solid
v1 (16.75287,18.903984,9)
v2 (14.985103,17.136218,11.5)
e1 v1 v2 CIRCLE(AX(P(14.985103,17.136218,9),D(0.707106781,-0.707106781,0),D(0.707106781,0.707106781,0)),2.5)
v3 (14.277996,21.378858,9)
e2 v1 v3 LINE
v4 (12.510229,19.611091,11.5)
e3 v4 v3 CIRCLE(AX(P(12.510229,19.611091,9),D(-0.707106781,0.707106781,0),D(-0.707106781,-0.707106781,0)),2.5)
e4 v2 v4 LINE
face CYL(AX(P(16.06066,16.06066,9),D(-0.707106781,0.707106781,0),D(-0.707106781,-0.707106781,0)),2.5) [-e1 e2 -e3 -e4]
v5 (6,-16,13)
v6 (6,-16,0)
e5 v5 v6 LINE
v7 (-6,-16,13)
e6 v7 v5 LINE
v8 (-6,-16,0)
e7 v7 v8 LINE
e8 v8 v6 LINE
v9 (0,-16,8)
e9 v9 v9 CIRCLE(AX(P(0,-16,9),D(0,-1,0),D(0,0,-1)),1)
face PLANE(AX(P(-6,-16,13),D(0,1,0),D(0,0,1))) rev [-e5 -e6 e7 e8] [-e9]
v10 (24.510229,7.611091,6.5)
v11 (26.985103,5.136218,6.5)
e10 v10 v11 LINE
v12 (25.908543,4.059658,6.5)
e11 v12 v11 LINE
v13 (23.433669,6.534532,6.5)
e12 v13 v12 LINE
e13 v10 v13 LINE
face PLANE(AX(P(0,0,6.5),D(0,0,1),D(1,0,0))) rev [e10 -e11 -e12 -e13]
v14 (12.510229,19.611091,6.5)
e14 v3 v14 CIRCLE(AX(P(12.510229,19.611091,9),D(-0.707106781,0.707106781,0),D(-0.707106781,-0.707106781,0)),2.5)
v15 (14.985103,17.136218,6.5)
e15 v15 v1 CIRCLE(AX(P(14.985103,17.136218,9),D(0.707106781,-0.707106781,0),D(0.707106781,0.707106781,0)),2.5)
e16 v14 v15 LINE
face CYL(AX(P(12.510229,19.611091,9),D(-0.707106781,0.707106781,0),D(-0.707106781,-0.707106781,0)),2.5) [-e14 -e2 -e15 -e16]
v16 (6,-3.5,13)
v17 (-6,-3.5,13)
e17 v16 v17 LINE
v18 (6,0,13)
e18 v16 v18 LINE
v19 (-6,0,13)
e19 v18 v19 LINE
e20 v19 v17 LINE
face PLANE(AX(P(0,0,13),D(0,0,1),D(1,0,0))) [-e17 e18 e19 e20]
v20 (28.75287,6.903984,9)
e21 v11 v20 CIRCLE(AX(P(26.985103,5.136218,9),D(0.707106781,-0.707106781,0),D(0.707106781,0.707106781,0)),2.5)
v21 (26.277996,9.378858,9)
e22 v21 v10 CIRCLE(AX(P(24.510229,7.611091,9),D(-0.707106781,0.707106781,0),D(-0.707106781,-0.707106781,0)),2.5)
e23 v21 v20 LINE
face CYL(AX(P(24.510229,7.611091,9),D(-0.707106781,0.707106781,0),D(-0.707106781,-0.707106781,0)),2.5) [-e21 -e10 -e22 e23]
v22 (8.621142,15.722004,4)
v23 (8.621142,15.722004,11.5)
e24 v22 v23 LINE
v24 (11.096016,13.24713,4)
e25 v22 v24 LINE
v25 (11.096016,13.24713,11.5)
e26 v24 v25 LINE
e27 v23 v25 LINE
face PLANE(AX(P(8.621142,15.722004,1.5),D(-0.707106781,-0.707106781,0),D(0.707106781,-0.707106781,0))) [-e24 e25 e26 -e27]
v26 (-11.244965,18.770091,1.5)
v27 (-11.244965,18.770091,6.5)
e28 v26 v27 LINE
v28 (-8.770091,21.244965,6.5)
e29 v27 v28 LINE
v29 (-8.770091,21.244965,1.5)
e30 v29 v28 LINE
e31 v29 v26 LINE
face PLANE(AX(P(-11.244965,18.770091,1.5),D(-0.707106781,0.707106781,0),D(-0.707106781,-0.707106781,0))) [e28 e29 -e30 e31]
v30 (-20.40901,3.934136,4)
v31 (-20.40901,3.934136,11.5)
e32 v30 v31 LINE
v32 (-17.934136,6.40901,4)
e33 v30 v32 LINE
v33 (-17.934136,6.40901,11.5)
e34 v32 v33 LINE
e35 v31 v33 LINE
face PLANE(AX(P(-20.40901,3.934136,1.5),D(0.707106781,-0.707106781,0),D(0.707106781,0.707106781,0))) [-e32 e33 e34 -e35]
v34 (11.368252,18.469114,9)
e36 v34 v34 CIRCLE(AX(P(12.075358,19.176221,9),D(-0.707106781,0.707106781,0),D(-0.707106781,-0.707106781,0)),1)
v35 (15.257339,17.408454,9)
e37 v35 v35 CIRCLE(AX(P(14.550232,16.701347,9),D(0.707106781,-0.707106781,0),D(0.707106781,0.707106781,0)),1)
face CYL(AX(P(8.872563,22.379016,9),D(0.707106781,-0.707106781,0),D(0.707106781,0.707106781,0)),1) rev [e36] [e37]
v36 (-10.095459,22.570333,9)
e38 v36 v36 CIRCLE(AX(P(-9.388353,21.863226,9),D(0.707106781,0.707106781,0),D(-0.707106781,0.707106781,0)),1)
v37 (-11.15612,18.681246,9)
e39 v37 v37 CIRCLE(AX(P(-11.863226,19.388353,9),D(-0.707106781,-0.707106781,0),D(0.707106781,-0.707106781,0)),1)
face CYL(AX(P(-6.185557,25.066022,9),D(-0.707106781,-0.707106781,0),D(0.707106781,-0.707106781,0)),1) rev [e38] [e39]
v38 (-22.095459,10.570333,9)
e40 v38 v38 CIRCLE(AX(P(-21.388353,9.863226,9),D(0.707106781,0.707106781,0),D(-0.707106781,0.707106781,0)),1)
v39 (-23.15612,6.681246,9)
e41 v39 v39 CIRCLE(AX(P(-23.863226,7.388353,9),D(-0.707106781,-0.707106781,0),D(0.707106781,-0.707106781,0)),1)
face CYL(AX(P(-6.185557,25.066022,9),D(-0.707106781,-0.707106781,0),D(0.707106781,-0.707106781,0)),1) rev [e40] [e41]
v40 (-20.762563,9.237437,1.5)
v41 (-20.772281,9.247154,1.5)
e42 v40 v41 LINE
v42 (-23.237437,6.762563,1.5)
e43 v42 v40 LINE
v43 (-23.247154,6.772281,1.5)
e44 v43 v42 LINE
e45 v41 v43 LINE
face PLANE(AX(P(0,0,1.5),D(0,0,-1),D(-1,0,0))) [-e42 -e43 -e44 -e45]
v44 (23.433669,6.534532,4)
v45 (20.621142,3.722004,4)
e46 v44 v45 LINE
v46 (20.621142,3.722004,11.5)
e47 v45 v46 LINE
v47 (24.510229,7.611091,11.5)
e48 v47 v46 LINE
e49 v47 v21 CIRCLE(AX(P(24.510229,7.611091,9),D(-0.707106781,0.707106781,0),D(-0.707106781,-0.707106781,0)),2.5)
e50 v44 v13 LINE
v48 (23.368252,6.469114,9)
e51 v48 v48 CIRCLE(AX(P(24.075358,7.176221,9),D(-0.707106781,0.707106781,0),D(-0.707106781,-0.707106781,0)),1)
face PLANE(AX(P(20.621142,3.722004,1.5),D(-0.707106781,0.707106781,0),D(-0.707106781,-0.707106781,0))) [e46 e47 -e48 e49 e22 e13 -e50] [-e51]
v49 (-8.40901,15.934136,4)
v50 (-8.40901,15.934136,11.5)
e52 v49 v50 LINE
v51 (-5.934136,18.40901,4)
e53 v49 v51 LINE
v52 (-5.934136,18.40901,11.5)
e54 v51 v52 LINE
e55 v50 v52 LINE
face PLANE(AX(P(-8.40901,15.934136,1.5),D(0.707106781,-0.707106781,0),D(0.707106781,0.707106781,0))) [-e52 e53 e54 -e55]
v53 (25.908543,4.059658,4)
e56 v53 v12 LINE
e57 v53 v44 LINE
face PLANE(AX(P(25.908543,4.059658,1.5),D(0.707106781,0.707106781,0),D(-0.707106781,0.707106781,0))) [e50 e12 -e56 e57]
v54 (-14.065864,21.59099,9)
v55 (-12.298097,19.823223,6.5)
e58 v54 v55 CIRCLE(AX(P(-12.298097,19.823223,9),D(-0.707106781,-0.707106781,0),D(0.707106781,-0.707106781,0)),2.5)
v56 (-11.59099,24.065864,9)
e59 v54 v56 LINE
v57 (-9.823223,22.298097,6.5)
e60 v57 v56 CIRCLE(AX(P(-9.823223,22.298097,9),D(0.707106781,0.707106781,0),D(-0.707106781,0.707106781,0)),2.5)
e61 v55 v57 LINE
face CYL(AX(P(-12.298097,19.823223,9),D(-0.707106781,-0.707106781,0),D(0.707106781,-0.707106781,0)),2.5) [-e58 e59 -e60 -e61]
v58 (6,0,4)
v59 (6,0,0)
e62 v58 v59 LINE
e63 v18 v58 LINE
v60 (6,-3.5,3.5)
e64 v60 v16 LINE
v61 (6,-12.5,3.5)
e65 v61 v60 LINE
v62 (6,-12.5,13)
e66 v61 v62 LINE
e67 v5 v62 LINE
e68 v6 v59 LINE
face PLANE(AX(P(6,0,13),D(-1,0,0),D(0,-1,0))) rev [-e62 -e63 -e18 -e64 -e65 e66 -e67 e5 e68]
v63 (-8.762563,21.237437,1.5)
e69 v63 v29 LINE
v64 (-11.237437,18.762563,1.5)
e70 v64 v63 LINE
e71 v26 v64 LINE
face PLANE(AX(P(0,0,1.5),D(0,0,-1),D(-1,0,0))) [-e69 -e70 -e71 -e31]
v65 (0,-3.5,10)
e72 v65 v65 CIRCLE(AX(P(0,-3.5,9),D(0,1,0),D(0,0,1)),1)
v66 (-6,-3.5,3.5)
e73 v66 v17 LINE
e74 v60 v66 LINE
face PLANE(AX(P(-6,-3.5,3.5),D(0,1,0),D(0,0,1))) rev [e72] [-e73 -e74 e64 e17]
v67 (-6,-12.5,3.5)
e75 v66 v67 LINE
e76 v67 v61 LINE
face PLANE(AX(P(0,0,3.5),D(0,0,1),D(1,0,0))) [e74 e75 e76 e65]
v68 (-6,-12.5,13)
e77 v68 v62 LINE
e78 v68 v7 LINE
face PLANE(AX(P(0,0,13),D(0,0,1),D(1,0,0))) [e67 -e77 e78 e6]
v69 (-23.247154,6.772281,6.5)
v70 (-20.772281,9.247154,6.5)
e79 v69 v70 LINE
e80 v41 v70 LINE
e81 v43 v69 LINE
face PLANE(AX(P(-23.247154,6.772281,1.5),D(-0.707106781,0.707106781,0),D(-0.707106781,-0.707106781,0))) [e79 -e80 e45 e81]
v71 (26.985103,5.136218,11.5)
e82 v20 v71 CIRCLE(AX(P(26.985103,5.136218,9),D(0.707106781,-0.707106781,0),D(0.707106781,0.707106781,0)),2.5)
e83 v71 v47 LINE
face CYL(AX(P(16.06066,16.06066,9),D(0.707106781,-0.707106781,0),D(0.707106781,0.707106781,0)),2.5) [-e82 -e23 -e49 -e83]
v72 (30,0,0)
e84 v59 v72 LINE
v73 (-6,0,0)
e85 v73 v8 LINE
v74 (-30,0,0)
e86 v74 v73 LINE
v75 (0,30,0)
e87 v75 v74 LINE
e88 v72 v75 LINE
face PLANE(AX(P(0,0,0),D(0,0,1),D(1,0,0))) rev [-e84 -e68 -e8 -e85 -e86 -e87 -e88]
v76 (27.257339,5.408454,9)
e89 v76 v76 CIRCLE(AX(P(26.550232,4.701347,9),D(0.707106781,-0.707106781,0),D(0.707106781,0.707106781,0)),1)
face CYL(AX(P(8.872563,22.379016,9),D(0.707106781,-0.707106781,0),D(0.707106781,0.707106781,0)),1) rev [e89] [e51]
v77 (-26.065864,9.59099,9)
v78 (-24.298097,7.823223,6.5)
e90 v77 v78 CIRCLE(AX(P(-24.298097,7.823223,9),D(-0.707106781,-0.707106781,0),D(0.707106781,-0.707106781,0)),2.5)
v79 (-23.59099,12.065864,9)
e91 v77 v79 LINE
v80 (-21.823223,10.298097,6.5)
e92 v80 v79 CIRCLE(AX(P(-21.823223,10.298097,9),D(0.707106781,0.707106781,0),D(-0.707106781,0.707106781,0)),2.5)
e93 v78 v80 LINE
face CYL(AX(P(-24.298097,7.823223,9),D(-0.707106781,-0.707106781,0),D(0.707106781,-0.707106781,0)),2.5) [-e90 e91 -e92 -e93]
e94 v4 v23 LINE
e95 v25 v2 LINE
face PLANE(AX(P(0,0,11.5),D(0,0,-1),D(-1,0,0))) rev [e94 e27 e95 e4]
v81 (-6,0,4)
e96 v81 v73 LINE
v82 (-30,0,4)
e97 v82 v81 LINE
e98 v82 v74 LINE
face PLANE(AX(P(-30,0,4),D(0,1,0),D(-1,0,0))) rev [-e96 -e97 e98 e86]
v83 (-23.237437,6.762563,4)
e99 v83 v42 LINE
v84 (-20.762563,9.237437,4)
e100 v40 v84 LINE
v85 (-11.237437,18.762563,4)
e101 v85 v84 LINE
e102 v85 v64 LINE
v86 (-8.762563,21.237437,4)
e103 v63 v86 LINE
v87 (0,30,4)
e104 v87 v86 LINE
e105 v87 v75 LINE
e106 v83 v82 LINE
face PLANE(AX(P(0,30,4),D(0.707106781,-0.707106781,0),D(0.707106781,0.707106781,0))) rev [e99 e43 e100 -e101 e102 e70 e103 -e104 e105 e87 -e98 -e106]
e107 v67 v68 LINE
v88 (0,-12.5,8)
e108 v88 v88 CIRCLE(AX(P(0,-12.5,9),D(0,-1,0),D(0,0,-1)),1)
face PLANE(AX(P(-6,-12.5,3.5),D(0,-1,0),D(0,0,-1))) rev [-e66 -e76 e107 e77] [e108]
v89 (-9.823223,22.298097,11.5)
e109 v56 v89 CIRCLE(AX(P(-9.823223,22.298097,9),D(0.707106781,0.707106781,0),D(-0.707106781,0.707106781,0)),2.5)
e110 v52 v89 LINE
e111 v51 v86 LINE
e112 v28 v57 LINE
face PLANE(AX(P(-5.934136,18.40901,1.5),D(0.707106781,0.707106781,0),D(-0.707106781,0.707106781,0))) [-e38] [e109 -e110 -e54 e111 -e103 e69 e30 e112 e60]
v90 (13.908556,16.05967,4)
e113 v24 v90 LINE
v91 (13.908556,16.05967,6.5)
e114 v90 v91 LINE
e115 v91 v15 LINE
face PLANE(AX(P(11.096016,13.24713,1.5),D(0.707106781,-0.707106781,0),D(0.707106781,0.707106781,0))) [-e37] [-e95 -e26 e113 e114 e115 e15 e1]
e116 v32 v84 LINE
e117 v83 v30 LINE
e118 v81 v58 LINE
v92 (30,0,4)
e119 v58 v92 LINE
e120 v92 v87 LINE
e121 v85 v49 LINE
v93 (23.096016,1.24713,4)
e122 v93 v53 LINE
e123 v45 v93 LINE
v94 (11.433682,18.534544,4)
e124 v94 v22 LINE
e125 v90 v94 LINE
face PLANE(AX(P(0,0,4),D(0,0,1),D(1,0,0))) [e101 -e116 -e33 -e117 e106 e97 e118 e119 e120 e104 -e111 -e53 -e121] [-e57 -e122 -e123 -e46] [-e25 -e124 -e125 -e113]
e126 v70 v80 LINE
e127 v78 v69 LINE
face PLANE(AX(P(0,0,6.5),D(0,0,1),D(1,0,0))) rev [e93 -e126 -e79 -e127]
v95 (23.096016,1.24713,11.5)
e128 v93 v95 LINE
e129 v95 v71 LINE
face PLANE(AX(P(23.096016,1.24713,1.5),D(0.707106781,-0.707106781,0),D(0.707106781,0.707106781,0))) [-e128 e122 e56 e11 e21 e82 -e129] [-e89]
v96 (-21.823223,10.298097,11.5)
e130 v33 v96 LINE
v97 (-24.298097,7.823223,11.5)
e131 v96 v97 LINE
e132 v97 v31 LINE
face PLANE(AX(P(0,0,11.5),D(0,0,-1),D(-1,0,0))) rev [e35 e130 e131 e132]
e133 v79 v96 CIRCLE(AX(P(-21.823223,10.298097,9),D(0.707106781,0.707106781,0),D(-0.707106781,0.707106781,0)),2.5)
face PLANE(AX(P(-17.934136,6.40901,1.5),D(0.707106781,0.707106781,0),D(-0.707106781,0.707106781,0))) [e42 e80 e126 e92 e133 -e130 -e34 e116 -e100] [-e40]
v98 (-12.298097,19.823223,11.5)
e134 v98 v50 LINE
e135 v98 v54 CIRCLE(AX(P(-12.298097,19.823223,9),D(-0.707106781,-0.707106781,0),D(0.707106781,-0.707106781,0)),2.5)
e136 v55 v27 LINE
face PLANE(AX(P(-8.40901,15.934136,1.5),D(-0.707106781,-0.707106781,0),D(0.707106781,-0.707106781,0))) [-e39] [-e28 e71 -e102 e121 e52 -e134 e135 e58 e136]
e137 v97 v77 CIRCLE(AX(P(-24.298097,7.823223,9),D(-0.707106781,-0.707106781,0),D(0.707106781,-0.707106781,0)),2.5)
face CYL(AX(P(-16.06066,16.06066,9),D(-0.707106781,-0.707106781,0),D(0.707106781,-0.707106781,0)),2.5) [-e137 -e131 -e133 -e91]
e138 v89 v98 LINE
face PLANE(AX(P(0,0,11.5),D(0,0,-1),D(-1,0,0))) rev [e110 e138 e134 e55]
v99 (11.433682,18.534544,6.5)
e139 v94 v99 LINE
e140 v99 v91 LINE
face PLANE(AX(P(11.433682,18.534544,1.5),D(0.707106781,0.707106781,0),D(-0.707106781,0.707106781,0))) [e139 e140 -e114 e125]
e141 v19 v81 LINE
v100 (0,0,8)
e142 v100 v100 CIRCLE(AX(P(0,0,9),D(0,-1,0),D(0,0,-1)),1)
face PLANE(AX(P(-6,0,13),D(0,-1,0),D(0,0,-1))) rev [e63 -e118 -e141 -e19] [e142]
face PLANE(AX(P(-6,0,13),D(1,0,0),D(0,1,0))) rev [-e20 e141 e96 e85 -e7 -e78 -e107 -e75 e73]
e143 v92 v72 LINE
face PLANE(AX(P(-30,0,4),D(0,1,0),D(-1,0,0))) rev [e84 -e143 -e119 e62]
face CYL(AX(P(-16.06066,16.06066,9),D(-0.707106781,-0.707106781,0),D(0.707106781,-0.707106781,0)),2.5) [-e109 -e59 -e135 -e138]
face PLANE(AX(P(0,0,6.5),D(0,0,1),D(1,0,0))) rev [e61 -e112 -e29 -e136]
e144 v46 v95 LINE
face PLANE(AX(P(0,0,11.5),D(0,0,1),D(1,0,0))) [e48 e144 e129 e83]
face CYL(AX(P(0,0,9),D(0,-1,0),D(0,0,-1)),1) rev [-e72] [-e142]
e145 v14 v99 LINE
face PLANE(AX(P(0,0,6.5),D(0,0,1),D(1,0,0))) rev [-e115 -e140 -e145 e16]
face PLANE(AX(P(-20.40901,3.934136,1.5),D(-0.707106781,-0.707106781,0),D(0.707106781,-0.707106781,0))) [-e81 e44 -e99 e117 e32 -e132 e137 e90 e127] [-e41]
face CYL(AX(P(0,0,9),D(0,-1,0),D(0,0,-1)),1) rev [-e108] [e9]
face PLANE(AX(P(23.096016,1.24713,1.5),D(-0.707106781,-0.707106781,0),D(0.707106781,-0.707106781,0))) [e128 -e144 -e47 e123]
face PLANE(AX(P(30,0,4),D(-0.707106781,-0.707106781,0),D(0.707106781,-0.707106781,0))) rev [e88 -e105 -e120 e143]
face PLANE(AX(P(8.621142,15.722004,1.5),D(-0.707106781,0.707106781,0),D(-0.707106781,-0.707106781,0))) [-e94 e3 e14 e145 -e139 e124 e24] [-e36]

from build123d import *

# Parameters (mm, degrees)
BOSS_EXTRUDE1_DEPTH   = 4
BOSS_EXTRUDE2_START   = -4
SKETCH2_W             = 12
SKETCH2_H             = 16
BOSS_EXTRUDE2_DEPTH   = 13
SKETCH3_W             = 12
SKETCH3_H             = 9
CUT_EXTRUDE1_DEPTH    = 9.5
SKETCH4_R             = 1
CUT_EXTRUDE2_DEPTH    = 16
BOSS_EXTRUDE3_START   = 2.5
BOSS_EXTRUDE3_DEPTH   = 5
BOSS_EXTRUDE3_2_DEPTH = 5
BOSS_EXTRUDE3_3_DEPTH = 5
BOSS_EXTRUDE3_4_DEPTH = 5
BOSS_EXTRUDE4_DEPTH   = 10
SKETCH6_R             = 1
CUT_EXTRUDE5_DEPTH    = 25
SKETCH7_R             = 1
CUT_EXTRUDE6_DEPTH    = 25
FILLET2_R             = 2.5


with BuildPart() as part:
    # Sketch1 → Boss-Extrude1 (new body)
    with BuildSketch(Plane.XY):
        Polygon((-30, 0), (30, 0), (0, 30), align=None)
    extrude(amount=BOSS_EXTRUDE1_DEPTH)

    # Sketch2 → Boss-Extrude2 (add)
    with BuildSketch(Plane.XY.offset(4).offset(BOSS_EXTRUDE2_START)):
        with Locations((0, -8)):
            Rectangle(SKETCH2_W, SKETCH2_H)
    extrude(amount=BOSS_EXTRUDE2_DEPTH)

    # Sketch3 → Cut-Extrude1 (cut)
    with BuildSketch(Plane.XY.offset(13)):
        with Locations((0, -8)):
            Rectangle(SKETCH3_W, SKETCH3_H)
    extrude(amount=-CUT_EXTRUDE1_DEPTH, mode=Mode.SUBTRACT)

    # Sketch4 → Cut-Extrude2 (cut)
    with BuildSketch(Plane.XZ.offset(16)):
        with Locations(Location((0, 9, 0), (0, 0, 270))):
            Circle(SKETCH4_R)
    extrude(amount=-CUT_EXTRUDE2_DEPTH, mode=Mode.SUBTRACT)



with BuildPart() as body_2:
    # Sketch5 → Boss-Extrude3 (new body)
    with BuildSketch(Plane.XY.offset(4).offset(BOSS_EXTRUDE3_START)):
        Polygon((-8.409009742, 15.934136008), (-14.065863992, 21.590990258), (-11.590990258, 24.065863992), (-5.934136008, 18.409009742), align=None)
    extrude(amount=BOSS_EXTRUDE3_DEPTH)


with BuildPart() as body_3:
    # Sketch5 → Boss-Extrude3 2 (new body)
    with BuildSketch(Plane.XY.offset(4).offset(BOSS_EXTRUDE3_START)):
        Polygon((-20.409009742, 3.934136008), (-26.065863992, 9.590990258), (-23.590990258, 12.065863992), (-17.934136008, 6.409009742), align=None)
    extrude(amount=BOSS_EXTRUDE3_2_DEPTH)


with BuildPart() as body_4:
    # Sketch5 → Boss-Extrude3 3 (new body)
    with BuildSketch(Plane.XY.offset(4).offset(BOSS_EXTRUDE3_START)):
        Polygon((8.621141777, 15.722003974), (14.277996026, 21.378858223), (16.75286976, 18.903984489), (11.096015511, 13.24713024), align=None)
    extrude(amount=BOSS_EXTRUDE3_3_DEPTH)


with BuildPart() as body_5:
    # Sketch5 → Boss-Extrude3 4 (new body)
    with BuildSketch(Plane.XY.offset(4).offset(BOSS_EXTRUDE3_START)):
        Polygon((20.621141777, 3.722003974), (26.277996026, 9.378858223), (28.75286976, 6.903984489), (23.096015511, 1.24713024), align=None)
    extrude(amount=BOSS_EXTRUDE3_4_DEPTH)


with BuildPart() as part_1:
    add(part.part)

    add(body_2.part)  # Boss-Extrude4 merges body 2

    add(body_3.part)  # Boss-Extrude4 merges body 3

    add(body_4.part)  # Boss-Extrude4 merges body 4

    add(body_5.part)  # Boss-Extrude4 merges body 5
    # Sketch8 → Boss-Extrude4 (add)
    with BuildSketch(Plane.XY.offset(11.5)):
        Polygon((-20.409009742, 3.934136008), (-17.934136008, 6.409009742), (-20.77228069, 9.247154424), (-23.247154424, 6.77228069), align=None)
        Polygon((-8.409009742, 15.934136008), (-5.934136008, 18.409009742), (-8.770090905, 21.24496464), (-11.24496464, 18.770090905), align=None)
        Polygon((8.621141777, 15.722003974), (11.096015511, 13.24713024), (13.908555635, 16.059670364), (11.433681901, 18.534544098), align=None)
        Polygon((23.096015511, 1.24713024), (20.621141777, 3.722003974), (23.433669477, 6.534531674), (25.908543211, 4.05965794), align=None)
    extrude(amount=-BOSS_EXTRUDE4_DEPTH)

    # Sketch6 → Cut-Extrude5 (cut)
    with BuildSketch(Plane(origin=(10.924442636, -10.924442636, 0), x_dir=(0.7071067811865506, 0.7071067811865446, 0), z_dir=(0.7071067811865446, -0.7071067811865506, 0))):
        with Locations((22.098203436, 9)):
            Circle(SKETCH6_R)
    extrude(amount=-CUT_EXTRUDE5_DEPTH, mode=Mode.SUBTRACT)

    # Sketch7 → Cut-Extrude6 (cut)
    with BuildSketch(Plane(origin=(-8.237436867, -8.237436867, 0), x_dir=(0, 0, 1), z_dir=(-0.7071067811865501, -0.7071067811865449, 0))):
        with Locations(Location((9, 22.098203436, 0), (0, 0, 270))):
            Circle(SKETCH7_R)
    extrude(amount=-CUT_EXTRUDE6_DEPTH, mode=Mode.SUBTRACT)

    # Fillet2
    fillet2_edges = [part_1.edges().sort_by_distance(p)[0] for p in [
        (15.515432893, 20.141421356, 11.5),
        (15.515432893, 20.141421356, 6.5),
        (27.515432893, 8.141421356, 6.5),
        (27.515432893, 8.141421356, 11.5),
        (-24.828427125, 10.828427125, 6.5),
        (-12.828427125, 22.828427125, 6.5),
        (-12.828427125, 22.828427125, 11.5),
        (-24.828427125, 10.828427125, 11.5),
    ]]
    fillet(fillet2_edges, radius=FILLET2_R - 0.0001)  # a hair under: the kernel refuses the full size


solid = part_1.part
